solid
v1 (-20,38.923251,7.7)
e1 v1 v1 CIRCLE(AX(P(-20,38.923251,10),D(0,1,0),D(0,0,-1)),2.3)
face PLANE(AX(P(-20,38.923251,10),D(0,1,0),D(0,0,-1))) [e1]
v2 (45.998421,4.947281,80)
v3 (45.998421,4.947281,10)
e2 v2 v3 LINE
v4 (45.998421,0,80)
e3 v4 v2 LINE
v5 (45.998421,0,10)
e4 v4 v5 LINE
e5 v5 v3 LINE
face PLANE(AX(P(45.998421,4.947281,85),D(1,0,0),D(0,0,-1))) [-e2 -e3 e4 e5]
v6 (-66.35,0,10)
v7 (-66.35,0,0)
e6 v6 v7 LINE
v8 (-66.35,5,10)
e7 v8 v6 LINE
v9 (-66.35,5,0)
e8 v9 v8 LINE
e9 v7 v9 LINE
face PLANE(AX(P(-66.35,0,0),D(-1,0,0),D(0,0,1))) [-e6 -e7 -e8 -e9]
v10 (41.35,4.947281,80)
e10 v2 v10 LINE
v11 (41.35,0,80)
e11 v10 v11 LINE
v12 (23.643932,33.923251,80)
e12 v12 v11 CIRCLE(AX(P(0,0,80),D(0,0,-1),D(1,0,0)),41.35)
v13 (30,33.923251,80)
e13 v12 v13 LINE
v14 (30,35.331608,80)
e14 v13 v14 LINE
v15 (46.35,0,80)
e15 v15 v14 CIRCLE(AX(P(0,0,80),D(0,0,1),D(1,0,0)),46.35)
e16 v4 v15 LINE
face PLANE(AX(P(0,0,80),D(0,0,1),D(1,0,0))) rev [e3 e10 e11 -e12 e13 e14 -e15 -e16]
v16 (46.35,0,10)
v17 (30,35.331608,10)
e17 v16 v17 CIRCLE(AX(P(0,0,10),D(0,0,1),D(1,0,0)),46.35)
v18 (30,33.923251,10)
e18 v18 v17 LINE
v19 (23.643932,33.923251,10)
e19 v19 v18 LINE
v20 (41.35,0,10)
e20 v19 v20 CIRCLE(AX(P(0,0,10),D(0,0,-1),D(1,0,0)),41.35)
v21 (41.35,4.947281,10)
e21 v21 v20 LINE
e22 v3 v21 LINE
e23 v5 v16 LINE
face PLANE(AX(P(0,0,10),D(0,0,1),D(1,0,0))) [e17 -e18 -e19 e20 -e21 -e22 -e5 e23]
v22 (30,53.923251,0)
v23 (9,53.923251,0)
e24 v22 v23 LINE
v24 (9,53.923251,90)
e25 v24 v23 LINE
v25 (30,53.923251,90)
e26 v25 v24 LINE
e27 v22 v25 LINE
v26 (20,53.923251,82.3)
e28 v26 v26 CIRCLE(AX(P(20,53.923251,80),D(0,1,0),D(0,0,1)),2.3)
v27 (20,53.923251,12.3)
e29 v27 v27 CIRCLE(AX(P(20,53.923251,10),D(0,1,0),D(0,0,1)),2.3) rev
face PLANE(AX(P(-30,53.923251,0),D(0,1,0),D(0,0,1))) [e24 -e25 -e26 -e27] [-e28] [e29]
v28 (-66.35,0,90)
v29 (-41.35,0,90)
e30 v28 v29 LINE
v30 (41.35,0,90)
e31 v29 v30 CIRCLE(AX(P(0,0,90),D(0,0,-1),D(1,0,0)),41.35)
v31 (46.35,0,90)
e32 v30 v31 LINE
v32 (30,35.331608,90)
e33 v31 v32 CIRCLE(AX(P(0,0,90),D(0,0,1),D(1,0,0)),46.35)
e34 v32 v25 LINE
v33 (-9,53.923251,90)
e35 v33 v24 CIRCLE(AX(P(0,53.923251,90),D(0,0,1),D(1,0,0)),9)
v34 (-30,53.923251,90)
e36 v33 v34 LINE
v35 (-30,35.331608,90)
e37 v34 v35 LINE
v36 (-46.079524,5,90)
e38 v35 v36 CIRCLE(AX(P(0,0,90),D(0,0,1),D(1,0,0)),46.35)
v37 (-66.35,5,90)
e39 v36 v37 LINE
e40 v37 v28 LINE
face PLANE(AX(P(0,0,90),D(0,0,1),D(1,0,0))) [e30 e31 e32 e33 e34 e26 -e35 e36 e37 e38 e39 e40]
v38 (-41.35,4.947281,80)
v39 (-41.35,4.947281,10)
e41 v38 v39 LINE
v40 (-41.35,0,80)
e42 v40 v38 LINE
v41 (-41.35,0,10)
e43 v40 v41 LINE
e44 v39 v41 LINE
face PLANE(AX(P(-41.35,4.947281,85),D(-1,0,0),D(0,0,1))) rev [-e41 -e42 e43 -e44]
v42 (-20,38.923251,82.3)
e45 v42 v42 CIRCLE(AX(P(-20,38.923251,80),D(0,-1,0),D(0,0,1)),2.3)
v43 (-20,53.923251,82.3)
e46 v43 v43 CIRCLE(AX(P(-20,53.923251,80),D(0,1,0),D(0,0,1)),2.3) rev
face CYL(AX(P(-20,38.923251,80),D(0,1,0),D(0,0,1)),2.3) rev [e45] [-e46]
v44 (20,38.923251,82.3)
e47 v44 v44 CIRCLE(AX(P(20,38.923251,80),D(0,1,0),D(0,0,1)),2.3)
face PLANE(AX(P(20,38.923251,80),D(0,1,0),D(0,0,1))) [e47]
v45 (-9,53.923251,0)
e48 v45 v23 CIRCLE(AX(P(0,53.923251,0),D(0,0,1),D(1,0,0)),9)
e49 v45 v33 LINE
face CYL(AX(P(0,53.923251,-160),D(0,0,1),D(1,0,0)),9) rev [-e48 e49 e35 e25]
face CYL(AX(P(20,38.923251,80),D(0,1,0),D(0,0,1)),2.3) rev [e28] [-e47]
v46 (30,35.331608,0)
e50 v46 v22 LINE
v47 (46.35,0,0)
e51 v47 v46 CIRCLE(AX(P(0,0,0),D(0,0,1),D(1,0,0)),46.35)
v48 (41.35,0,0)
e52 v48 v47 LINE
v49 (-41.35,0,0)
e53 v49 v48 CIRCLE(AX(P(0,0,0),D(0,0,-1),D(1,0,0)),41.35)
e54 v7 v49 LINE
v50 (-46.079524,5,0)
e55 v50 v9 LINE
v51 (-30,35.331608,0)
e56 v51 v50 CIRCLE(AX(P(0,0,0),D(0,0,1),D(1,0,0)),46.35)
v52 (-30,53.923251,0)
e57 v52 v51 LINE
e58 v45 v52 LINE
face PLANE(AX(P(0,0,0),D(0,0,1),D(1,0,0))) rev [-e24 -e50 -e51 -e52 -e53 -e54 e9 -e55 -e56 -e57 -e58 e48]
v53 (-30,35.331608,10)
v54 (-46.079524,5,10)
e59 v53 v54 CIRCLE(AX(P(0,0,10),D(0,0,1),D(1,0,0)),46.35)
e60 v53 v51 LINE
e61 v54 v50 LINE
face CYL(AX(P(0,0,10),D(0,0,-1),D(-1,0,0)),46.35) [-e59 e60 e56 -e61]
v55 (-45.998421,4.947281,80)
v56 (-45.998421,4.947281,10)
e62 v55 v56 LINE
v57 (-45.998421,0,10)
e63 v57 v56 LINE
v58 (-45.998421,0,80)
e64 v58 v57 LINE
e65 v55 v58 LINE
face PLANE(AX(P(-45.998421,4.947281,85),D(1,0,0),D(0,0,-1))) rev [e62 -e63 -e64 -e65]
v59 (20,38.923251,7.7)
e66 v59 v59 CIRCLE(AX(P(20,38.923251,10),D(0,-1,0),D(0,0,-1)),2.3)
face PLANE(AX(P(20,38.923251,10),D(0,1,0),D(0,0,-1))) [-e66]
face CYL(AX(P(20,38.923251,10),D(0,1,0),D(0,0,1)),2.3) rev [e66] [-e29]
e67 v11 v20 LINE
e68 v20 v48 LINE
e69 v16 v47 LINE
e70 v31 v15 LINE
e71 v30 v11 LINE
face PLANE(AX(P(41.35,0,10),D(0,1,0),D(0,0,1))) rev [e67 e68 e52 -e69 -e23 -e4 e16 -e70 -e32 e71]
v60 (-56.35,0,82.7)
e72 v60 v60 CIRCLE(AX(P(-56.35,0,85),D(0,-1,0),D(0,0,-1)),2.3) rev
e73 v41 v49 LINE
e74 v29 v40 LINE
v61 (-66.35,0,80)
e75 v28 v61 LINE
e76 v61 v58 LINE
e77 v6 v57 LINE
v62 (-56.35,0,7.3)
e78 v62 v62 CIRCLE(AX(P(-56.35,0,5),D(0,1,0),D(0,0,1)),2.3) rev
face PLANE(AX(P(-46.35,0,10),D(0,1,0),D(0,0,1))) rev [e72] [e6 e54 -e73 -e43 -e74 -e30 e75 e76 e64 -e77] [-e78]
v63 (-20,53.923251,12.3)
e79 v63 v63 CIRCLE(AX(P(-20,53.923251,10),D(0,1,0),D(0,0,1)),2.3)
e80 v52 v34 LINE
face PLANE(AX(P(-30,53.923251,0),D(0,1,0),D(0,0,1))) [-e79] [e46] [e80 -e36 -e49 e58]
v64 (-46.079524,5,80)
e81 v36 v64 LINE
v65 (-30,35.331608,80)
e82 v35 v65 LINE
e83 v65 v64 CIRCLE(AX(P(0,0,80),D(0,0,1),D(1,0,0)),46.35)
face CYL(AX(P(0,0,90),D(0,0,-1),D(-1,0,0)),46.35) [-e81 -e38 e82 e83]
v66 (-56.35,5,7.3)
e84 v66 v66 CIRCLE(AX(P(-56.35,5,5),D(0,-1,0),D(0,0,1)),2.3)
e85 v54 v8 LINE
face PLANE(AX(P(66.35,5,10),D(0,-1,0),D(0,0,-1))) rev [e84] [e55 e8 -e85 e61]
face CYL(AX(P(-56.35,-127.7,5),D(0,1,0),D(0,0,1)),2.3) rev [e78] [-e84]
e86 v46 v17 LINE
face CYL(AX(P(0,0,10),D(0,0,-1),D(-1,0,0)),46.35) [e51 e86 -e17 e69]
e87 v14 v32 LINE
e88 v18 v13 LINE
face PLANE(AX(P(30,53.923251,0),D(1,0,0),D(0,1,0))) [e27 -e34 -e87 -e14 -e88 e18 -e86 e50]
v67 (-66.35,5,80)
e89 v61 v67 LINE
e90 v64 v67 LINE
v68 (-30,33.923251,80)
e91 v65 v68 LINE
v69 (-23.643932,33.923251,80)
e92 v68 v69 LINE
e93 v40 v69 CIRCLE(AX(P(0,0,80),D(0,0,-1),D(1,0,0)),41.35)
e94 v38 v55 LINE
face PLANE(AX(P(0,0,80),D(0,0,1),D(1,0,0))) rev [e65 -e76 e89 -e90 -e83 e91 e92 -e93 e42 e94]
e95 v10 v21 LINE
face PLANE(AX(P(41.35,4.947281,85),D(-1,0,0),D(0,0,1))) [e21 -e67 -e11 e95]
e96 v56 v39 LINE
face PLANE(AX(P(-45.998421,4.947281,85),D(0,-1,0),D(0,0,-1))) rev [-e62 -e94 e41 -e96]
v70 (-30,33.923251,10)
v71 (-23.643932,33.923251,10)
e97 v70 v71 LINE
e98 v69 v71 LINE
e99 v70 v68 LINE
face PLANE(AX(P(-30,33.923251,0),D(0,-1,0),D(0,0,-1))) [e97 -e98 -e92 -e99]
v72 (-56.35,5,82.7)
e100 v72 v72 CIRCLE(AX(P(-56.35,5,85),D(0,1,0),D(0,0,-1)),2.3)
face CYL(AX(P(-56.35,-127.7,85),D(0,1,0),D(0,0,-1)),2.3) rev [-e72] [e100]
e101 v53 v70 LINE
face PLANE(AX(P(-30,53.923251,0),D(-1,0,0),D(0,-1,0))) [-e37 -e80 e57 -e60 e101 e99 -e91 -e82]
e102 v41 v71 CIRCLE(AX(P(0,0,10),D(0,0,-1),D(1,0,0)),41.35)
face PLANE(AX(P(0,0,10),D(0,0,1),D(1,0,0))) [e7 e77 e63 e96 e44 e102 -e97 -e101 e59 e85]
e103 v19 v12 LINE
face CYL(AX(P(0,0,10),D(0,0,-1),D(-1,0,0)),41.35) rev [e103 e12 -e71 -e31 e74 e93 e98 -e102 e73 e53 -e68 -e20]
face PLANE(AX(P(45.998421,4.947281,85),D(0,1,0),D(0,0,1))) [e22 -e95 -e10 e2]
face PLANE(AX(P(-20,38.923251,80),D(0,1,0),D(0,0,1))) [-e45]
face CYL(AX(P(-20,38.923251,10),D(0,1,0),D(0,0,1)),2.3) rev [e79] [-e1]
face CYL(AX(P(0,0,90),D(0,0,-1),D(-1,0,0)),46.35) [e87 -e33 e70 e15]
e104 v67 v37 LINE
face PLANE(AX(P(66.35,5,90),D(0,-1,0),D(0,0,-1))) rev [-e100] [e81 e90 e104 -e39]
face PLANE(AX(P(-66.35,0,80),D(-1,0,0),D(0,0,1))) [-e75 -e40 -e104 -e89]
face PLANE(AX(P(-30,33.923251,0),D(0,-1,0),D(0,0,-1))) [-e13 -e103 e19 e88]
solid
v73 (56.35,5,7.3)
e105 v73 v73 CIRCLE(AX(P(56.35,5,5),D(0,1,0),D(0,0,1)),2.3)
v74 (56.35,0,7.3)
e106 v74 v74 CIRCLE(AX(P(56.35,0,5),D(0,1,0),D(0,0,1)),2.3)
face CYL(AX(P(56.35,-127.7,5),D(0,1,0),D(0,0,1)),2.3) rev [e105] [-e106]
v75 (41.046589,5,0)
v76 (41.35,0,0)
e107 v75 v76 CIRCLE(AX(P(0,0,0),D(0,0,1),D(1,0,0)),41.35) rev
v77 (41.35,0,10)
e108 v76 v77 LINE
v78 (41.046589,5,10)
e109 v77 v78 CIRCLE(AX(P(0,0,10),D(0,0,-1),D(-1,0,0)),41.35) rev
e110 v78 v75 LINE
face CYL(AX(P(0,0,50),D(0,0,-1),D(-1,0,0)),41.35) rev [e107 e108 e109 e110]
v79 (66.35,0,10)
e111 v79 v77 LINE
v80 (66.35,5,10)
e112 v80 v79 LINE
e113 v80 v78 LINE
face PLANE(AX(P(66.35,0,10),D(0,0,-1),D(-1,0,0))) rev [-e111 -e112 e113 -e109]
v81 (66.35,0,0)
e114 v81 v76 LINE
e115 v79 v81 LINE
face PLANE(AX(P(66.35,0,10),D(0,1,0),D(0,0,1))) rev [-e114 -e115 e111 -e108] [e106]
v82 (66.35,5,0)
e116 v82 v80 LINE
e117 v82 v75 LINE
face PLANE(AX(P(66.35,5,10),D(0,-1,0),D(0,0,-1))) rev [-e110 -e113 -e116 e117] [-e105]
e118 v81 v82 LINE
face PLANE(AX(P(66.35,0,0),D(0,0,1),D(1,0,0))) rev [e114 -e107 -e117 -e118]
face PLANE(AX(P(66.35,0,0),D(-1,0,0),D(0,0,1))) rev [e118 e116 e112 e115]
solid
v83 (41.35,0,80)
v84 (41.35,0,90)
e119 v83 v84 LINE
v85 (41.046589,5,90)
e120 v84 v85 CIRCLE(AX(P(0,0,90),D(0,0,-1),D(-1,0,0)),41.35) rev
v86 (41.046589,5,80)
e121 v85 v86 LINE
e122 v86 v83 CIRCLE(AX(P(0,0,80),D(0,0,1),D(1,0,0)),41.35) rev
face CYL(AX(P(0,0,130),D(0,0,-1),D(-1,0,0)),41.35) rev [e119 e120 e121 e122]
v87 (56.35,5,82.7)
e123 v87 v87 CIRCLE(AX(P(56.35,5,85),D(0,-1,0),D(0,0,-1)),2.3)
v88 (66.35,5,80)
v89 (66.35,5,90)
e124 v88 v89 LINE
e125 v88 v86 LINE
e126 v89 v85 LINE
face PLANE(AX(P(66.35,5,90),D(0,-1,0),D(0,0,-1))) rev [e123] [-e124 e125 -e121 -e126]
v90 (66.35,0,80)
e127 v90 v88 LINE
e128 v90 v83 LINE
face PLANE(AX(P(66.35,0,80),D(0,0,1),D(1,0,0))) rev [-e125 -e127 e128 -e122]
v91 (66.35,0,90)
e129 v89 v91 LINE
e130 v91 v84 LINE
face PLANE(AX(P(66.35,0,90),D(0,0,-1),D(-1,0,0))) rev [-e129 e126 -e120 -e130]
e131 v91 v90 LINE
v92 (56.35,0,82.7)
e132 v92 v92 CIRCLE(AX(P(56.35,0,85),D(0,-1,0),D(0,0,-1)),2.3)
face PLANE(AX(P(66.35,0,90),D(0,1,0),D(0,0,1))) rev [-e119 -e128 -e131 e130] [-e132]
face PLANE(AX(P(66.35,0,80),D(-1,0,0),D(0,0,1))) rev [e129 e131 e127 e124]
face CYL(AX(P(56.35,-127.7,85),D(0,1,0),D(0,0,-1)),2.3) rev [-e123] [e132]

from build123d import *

# Parameters (mm, degrees)
BOSS_EXTRUDE1_DEPTH     = 10
SKETCH2_W               = 10
SKETCH2_H               = 5
BOSS_EXTRUDE2_DEPTH     = 66.35
SKETCH3_R               = 2.3
CUT_EXTRUDE1_DEPTH      = 132.7
SKETCH4_R               = 41.35
CUT_EXTRUDE3_DEPTH      = 50
LPATTERN4_START         = 80
LPATTERN4_DEPTH         = 10
LPATTERN4_2_DEPTH       = 10
LPATTERN4_3_DEPTH       = 10
MIRROR5_COPY_1_SKETCH_R = 2.3
MIRROR5_COPY_1_DEPTH    = 132.7
SKETCH8_W               = 4.648420871
SKETCH8_H               = 4.94728133
BOSS_EXTRUDE3_DEPTH     = 40
SKETCH11_W              = 60
SKETCH11_H              = 20
BOSS_EXTRUDE4_DEPTH     = 90
SKETCH12_R              = 41.35
CUT_EXTRUDE4_DEPTH      = 250
SKETCH13_R              = 9
CUT_EXTRUDE5_DEPTH      = 250
SKETCH14_R              = 2.3
CUT_EXTRUDE6_DEPTH      = 15
MIRROR8_COPY_1_SKETCH_R = 2.3
MIRROR8_COPY_1_DEPTH    = 15


# Read off the part's stored shape, not the designer's step: LPattern4
with BuildPart() as part:
    # Sketch1 → Boss-Extrude1 (new body)
    with BuildSketch(Plane.XY):
        with BuildLine():
            Line((-46.35, 0), (-41.35, 0))
            ThreePointArc((-41.35, 0), (0, 41.35), (41.35, 0))
            Line((41.35, 0), (46.35, 0))
            ThreePointArc((46.35, 0), (0, 46.35), (-46.35, 0))
        make_face()
    extrude(amount=BOSS_EXTRUDE1_DEPTH)



with BuildPart() as body_2:
    # Sketch2 → Boss-Extrude2 (new, symmetric)
    with BuildSketch(Plane(origin=(0, 0, 0), x_dir=(0, 0, -1), z_dir=(1, 0, 0))):
        with Locations((-5, 2.5)):
            Rectangle(SKETCH2_W, SKETCH2_H)
    extrude(amount=BOSS_EXTRUDE2_DEPTH, both=True)

    # Sketch3 → Cut-Extrude1 (cut)
    with BuildSketch(Plane(origin=(0, 5, 0), x_dir=(1, 0, 0), z_dir=(0, 1, 0))):
        with Locations(Location((56.35, -5, 0), (0, 0, 270))):
            Circle(SKETCH3_R)
    cut_extrude1 = extrude(amount=-CUT_EXTRUDE1_DEPTH, mode=Mode.SUBTRACT)

    # Mirror1: Cut-Extrude1 across plane
    add(cut_extrude1.mirror(Plane(origin=(0, 0, 0), x_dir=(0, 0, 1), z_dir=(1, 0, 0))), mode=Mode.SUBTRACT)

    # Sketch4 → Cut-Extrude3 (cut, symmetric)
    with BuildSketch(Plane.XY):
        Circle(SKETCH4_R)
    extrude(amount=CUT_EXTRUDE3_DEPTH, both=True, mode=Mode.SUBTRACT)


with BuildPart() as cut_extrude3_piece_1:
    # of the separate pieces the step leaves, piece 1, a body of its own (cut_extrude3_pieces)
    add(body_2.part.solids().sort_by_distance((-41.35, 0, 10))[0])


with BuildPart() as cut_extrude3_piece_2:
    # of the separate pieces the step leaves, piece 2, a body of its own (cut_extrude3_pieces)
    add(body_2.part.solids().sort_by_distance((66.35, 0, 10))[0])


with BuildPart() as body_4:
    # LPattern4 outline → LPattern4 (new body)
    with BuildSketch(Plane.XY.offset(LPATTERN4_START)):
        with BuildLine():
            Line((66.35, 0), (66.35, 5))
            Line((66.35, 5), (41.046589383, 5))
            ThreePointArc((41.046589383, 5), (41.274077646, 2.504598671), (41.35, 0))
            Line((41.35, 0), (66.35, 0))
        make_face()
    extrude(amount=LPATTERN4_DEPTH)

    # Mirror5: Cut-Extrude1 across plane
    add(cut_extrude1.mirror(Plane.XY.offset(45)), mode=Mode.SUBTRACT)


with BuildPart() as body_5:
    # LPattern4 2 outline → LPattern4 2 (new body)
    with BuildSketch(Plane.XY.offset(LPATTERN4_START)):
        with BuildLine():
            Line((-66.35, 0), (-41.35, 0))
            ThreePointArc((-41.35, 0), (-41.274077646, 2.504598671), (-41.046589383, 5))
            Line((-41.046589383, 5), (-66.35, 5))
            Line((-66.35, 5), (-66.35, 0))
        make_face()
    extrude(amount=LPATTERN4_2_DEPTH)

    # Mirror5 copy 1 sketch → Mirror5 copy 1 (cut)
    with BuildSketch(Plane(origin=(0, 5, 90), x_dir=(-1, 0, 0), z_dir=(0, 1, 0))):
        with Locations(Location((56.35, -5, 0), (0, 0, 270))):
            Circle(MIRROR5_COPY_1_SKETCH_R)
    extrude(amount=-MIRROR5_COPY_1_DEPTH, mode=Mode.SUBTRACT)


with BuildPart() as body_6:
    # LPattern4 3 outline → LPattern4 3 (new body)
    with BuildSketch(Plane.XY.offset(LPATTERN4_START)):
        with BuildLine():
            Line((-46.35, 0), (-41.35, 0))
            ThreePointArc((-41.35, 0), (0, 41.35), (41.35, 0))
            Line((41.35, 0), (46.35, 0))
            ThreePointArc((46.35, 0), (0, 46.35), (-46.35, 0))
        make_face()
    extrude(amount=LPATTERN4_3_DEPTH)


with BuildPart() as part_1:
    add(part.part)

    add(cut_extrude3_piece_1.part)  # Boss-Extrude3 merges Cut-Extrude3 piece 1

    add(body_5.part)  # Boss-Extrude3 merges body 5

    add(body_6.part)  # Boss-Extrude3 merges body 6
    # Sketch8 → Boss-Extrude3 (add, symmetric)
    with BuildSketch(Plane.XY.offset(45)):
        with Locations((-43.674210436, 2.473640665)):
            Rectangle(SKETCH8_W, SKETCH8_H)
    boss_extrude3 = extrude(amount=BOSS_EXTRUDE3_DEPTH, both=True)

    # Mirror6: Boss-Extrude3 across plane
    add(boss_extrude3.mirror(Plane(origin=(0, 0, 0), x_dir=(0, 0, 1), z_dir=(1, 0, 0))))

    # Sketch11 → Boss-Extrude4 (add)
    with BuildSketch(Plane.XY.offset(90)):
        with Locations((0, 43.923251299)):
            Rectangle(SKETCH11_W, SKETCH11_H)
    extrude(amount=-BOSS_EXTRUDE4_DEPTH)

    # Sketch12 → Cut-Extrude4 (cut, symmetric)
    with BuildSketch(Plane.XY.offset(90)):
        Circle(SKETCH12_R)
    extrude(amount=CUT_EXTRUDE4_DEPTH, both=True, mode=Mode.SUBTRACT)

    # Sketch13 → Cut-Extrude5 (cut, symmetric)
    with BuildSketch(Plane.XY.offset(90)):
        with Locations((0, 53.923251299)):
            Circle(SKETCH13_R)
    extrude(amount=CUT_EXTRUDE5_DEPTH, both=True, mode=Mode.SUBTRACT)

    # Sketch14 → Cut-Extrude6 (cut, symmetric)
    with BuildSketch(Plane(origin=(0, 53.923251299, 0), x_dir=(1, 0, 0), z_dir=(0, 1, 0))):
        with Locations(Location((20, -80, 0), (0, 0, 270))):
            Circle(SKETCH14_R)
    cut_extrude6 = extrude(amount=CUT_EXTRUDE6_DEPTH, both=True, mode=Mode.SUBTRACT)

    # Mirror7: Cut-Extrude6 across plane
    add(cut_extrude6.mirror(Plane(origin=(0, 0, 0), x_dir=(0, 0, 1), z_dir=(1, 0, 0))), mode=Mode.SUBTRACT)

    # Mirror8: Cut-Extrude6 across plane
    add(cut_extrude6.mirror(Plane.XY.offset(45)), mode=Mode.SUBTRACT)

    # Mirror8 copy 1 sketch → Mirror8 copy 1 (cut, symmetric)
    with BuildSketch(Plane(origin=(0, 53.923251299, 90), x_dir=(-1, 0, 0), z_dir=(0, 1, 0))):
        with Locations(Location((20, -80, 0), (0, 0, 270))):
            Circle(MIRROR8_COPY_1_SKETCH_R)
    extrude(amount=MIRROR8_COPY_1_DEPTH, both=True, mode=Mode.SUBTRACT)


solid = Compound([cut_extrude3_piece_2.part, body_4.part, part_1.part])
